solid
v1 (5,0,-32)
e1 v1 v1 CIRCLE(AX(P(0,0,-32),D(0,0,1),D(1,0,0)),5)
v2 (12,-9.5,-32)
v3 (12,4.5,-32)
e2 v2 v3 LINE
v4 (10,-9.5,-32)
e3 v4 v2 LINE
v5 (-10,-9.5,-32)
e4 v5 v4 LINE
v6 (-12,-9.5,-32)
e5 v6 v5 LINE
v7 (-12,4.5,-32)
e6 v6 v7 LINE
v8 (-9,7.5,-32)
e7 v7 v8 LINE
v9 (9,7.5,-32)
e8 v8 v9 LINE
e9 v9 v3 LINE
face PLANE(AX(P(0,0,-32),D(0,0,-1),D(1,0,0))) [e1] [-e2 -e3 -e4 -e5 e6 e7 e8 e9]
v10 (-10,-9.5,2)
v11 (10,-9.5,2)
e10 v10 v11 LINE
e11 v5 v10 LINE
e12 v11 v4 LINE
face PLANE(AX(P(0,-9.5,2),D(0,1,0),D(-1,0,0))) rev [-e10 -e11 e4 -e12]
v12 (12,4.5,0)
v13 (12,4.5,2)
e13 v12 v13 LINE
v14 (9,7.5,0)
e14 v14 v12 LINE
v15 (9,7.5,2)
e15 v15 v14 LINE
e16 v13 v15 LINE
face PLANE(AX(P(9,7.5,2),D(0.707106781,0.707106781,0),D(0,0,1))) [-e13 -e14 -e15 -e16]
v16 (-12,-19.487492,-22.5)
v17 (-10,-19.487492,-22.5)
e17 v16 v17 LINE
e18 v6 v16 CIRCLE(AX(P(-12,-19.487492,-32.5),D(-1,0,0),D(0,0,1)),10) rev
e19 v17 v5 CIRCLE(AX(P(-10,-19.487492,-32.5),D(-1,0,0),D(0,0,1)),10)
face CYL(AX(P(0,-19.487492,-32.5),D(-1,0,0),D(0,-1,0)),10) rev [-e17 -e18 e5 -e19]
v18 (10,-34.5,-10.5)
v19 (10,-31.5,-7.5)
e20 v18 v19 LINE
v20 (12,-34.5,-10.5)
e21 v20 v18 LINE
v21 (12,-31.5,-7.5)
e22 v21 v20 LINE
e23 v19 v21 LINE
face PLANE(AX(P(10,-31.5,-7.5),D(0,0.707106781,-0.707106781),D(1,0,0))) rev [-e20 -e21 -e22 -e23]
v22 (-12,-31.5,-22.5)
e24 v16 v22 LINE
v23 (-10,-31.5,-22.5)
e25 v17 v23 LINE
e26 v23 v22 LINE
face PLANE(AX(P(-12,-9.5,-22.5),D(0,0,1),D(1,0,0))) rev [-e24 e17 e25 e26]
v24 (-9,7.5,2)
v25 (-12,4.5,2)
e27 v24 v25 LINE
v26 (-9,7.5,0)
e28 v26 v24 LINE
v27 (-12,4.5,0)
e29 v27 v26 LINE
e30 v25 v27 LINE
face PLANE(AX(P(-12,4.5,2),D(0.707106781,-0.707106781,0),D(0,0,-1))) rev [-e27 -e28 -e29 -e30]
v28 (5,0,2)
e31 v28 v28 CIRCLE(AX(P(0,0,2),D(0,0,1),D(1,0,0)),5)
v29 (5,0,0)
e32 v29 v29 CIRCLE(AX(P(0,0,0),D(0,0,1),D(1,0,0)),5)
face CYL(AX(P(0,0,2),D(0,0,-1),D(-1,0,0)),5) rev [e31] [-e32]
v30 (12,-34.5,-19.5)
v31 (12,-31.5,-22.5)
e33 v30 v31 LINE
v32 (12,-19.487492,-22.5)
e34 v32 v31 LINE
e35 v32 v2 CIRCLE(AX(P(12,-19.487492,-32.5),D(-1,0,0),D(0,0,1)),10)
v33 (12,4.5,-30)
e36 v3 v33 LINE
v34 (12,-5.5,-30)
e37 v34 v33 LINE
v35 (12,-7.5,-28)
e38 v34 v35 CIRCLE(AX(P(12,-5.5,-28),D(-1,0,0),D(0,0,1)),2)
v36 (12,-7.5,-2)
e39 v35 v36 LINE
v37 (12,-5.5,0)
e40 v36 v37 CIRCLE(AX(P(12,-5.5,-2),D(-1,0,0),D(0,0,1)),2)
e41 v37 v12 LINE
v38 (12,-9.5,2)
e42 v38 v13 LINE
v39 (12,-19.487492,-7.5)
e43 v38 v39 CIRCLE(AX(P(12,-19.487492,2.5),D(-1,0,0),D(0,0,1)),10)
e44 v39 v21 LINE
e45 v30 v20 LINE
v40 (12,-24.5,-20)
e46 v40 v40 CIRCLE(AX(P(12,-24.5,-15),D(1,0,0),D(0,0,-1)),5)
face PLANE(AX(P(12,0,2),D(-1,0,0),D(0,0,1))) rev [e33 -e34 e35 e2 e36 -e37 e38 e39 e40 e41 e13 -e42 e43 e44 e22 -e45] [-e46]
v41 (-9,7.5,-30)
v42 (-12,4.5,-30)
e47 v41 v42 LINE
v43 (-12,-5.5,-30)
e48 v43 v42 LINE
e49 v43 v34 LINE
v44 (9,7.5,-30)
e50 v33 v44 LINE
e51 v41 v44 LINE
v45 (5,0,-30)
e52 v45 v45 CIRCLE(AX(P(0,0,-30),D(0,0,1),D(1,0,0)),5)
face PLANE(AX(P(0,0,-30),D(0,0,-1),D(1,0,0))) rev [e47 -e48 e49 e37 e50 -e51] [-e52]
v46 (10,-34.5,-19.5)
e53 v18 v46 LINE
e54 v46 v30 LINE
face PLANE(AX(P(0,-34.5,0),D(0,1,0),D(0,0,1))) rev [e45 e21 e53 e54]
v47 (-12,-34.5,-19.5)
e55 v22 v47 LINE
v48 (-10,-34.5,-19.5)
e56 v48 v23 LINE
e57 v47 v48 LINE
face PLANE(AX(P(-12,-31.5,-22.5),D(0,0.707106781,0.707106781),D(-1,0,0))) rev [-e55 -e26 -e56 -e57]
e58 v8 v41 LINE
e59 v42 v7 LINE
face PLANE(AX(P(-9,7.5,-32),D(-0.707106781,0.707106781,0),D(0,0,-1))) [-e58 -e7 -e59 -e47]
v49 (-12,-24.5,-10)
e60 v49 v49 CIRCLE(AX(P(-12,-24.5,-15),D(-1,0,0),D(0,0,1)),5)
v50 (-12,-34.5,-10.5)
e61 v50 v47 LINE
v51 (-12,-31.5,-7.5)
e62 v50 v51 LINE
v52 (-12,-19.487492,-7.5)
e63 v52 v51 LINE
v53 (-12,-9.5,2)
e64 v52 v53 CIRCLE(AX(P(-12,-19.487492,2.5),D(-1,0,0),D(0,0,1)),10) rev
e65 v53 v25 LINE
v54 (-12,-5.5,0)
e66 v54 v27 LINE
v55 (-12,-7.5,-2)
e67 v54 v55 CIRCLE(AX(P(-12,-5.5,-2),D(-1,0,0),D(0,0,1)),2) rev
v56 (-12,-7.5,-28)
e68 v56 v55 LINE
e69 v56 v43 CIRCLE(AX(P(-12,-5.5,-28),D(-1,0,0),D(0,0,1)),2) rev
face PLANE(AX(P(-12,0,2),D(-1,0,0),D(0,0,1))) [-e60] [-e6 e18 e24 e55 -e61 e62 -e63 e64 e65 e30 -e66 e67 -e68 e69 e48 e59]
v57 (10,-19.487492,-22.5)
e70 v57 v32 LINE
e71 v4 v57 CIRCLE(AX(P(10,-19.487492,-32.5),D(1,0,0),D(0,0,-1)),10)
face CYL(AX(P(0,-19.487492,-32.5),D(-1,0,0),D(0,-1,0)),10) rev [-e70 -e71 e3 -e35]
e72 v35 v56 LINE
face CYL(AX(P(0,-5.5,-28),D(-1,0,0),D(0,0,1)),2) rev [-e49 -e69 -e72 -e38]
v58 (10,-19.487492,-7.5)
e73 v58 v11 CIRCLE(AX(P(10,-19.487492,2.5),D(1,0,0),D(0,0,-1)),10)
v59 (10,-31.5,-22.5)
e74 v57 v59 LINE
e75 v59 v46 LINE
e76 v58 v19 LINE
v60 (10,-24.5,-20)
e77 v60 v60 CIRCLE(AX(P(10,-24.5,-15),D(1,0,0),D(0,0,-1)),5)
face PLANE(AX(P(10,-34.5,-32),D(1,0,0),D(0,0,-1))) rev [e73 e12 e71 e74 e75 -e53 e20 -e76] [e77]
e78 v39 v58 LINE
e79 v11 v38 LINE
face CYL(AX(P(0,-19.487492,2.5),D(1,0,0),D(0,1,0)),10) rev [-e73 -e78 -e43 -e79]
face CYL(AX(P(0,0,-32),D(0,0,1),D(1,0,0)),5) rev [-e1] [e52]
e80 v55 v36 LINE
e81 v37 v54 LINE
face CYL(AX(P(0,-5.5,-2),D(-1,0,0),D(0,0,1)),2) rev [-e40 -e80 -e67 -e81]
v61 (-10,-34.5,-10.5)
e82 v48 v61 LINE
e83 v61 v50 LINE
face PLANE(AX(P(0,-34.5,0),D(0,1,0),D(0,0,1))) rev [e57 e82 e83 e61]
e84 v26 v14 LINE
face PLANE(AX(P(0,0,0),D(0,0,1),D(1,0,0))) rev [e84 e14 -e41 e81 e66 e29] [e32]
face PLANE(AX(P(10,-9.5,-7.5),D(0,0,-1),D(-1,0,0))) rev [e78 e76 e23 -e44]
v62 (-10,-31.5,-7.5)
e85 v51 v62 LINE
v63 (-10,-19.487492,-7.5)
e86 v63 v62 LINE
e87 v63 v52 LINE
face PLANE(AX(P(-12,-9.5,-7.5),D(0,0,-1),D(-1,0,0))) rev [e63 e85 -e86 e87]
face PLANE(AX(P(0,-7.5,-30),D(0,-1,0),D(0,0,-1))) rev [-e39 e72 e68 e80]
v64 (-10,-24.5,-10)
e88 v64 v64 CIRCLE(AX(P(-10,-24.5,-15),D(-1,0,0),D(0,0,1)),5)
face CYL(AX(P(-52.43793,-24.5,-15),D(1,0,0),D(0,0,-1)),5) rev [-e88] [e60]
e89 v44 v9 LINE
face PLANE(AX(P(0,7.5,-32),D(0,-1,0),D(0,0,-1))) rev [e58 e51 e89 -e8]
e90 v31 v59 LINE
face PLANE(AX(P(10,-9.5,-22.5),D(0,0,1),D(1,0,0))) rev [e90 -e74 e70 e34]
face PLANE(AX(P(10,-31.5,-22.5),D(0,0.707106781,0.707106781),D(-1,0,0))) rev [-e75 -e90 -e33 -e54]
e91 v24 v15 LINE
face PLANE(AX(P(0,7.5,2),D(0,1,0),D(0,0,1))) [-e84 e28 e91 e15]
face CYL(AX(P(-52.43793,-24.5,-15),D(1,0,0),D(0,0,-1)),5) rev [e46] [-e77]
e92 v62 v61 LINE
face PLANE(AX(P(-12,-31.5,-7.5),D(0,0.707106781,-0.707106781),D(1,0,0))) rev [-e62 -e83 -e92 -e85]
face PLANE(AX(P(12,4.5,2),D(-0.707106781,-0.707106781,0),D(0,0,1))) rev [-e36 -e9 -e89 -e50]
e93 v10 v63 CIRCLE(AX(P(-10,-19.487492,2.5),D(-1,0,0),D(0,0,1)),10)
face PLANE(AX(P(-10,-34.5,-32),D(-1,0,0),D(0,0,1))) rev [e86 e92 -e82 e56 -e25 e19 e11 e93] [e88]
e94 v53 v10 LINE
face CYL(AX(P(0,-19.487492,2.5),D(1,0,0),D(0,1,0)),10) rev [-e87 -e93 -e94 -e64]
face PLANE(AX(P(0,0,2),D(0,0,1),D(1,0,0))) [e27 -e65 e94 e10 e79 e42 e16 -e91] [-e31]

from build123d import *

# Parameters (mm, degrees)
SKETCH1_W           = 24
SKETCH1_H           = 15
SKETCH1_R           = 5
SKETCH1_H_2         = 2
BOSS_EXTRUDE1_DEPTH = 2
SKETCH1_3_W         = 24
SKETCH1_3_H         = 2
BOSS_EXTRUDE2_DEPTH = 30
SKETCH3_W           = 2
SKETCH3_H           = 34
BOSS_EXTRUDE3_DEPTH = 25
SKETCH4_W           = 2
SKETCH4_H           = 9.5
CUT_EXTRUDE1_DEPTH  = 25
SKETCH5_R           = 5
CUT_EXTRUDE2_DEPTH  = 64.437930135
FILLET1_R           = 10
FILLET2_R           = 2
CHAMFER1_SIZE       = 3


with BuildPart() as part:
    # Sketch1 → Boss-Extrude1 (new body)
    # profile 1 of 2: a face of its own
    with BuildSketch(Plane.XY):
        Rectangle(SKETCH1_W, SKETCH1_H)
        Circle(SKETCH1_R, mode=Mode.SUBTRACT)
    # profile 2 of 2: a face of its own
    with BuildSketch(Plane.XY):
        with Locations((0, -8.5)):
            Rectangle(SKETCH1_W, SKETCH1_H_2)
    boss_extrude1 = extrude(amount=BOSS_EXTRUDE1_DEPTH)

    # Sketch1<3> → Boss-Extrude2 (add)
    with BuildSketch(Plane.XY):
        with Locations((0, -8.5)):
            Rectangle(SKETCH1_3_W, SKETCH1_3_H)
    extrude(amount=-BOSS_EXTRUDE2_DEPTH)

    # Mirror1: Boss-Extrude1 across plane
    add(boss_extrude1.mirror(Plane(origin=(0, 0, -15), x_dir=(1, 0, 0), z_dir=(0, 0, -1))))

    # Sketch3 → Boss-Extrude3 (add)
    with BuildSketch(Plane.XZ.offset(9.5)):
        with Locations((-11, -15)):
            Rectangle(SKETCH3_W, SKETCH3_H)
        with Locations((11, -15)):
            Rectangle(SKETCH3_W, SKETCH3_H)
    extrude(amount=BOSS_EXTRUDE3_DEPTH)

    # Sketch4 → Cut-Extrude1 (cut)
    with BuildSketch(Plane.XZ.offset(34.5)):
        with Locations((-11, -27.25)):
            Rectangle(SKETCH4_W, SKETCH4_H)
        with Locations((-11, -2.75)):
            Rectangle(SKETCH4_W, SKETCH4_H)
        with Locations((11, -2.75)):
            Rectangle(SKETCH4_W, SKETCH4_H)
        with Locations((11, -27.25)):
            Rectangle(SKETCH4_W, SKETCH4_H)
    extrude(amount=-CUT_EXTRUDE1_DEPTH, mode=Mode.SUBTRACT)

    # Sketch5 → Cut-Extrude2 (cut)
    with BuildSketch(Plane(origin=(12, 0, 0), x_dir=(0, 0, -1), z_dir=(1, 0, 0))):
        with Locations((15, -24.5)):
            Circle(SKETCH5_R)
    extrude(amount=-CUT_EXTRUDE2_DEPTH, mode=Mode.SUBTRACT)

    # Fillet1
    # the kernel refuses this fillet: 10 mm, written as the material it adds along each edge
    with BuildSketch(Plane(origin=(12, -9.5, -7.5), x_dir=(0, 0, 1), z_dir=(-1, 0, 0)), Plane(origin=(-10, -9.5, -7.5), x_dir=(0, 0, 1), z_dir=(-1, 0, 0))) as fillet1_piece_1:
        with BuildLine():
            CenterArc((10, -9.987492178), FILLET1_R, 92.865983983, 87.134016017)
            Line((0, -9.987492178), (-0.2, -9.987492178))
            Line((-0.2, -9.987492178), (-0.2, 0))
            Line((-0.2, 0), (0, 0.2))
            ThreePointArc((0, 0.2), (4.75, 0.2), (9.49, 0.199749844))
            Line((9.49, 0.199749844), (9.5, 0))
        make_face()
    extrude(amount=2)
    with BuildSketch(Plane(origin=(12, -9.5, -7.5), x_dir=(0, 0, 1), z_dir=(-1, 0, 0))) as fillet1_piece_2_section:
        with BuildLine():
            CenterArc((10, -9.987492178), FILLET1_R, 92.865983983, 87.134016017)
            Line((0, -9.987492178), (-0.2, -9.987492178))
            Line((-0.2, -9.987492178), (-0.2, 0))
            Line((-0.2, 0), (0, 0.2))
            ThreePointArc((0, 0.2), (4.75, 0.2), (9.49, 0.199749844))
            Line((9.49, 0.199749844), (9.5, 0))
        make_face()
    fillet1_piece_2 = extrude(amount=26.968730444, mode=Mode.PRIVATE)
    fillet1_piece_2 = split(fillet1_piece_2, bisect_by=Plane(origin=(-12, -11.774818107, -5.276261627), z_dir=(1, 0, 0)), keep=Keep.TOP, mode=Mode.PRIVATE)
    fillet1_piece_2 = split(fillet1_piece_2, bisect_by=Plane(origin=(-10, -11.774818107, -5.276261627), z_dir=(-1, 0, 0)), keep=Keep.TOP, mode=Mode.PRIVATE)
    add(fillet1_piece_2)
    with BuildSketch(Plane(origin=(12, -9.5, -22.5), x_dir=(0, 0, -1), z_dir=(-1, 0, 0)), Plane(origin=(-10, -9.5, -22.5), x_dir=(0, 0, -1), z_dir=(-1, 0, 0))) as fillet1_piece_3:
        with BuildLine():
            CenterArc((10, 9.987492178), FILLET1_R, 180, 87.134016017)
            Line((0, 9.987492178), (-0.2, 9.987492178))
            Line((-0.2, 9.987492178), (-0.2, 0))
            Line((-0.2, 0), (0, -0.2))
            ThreePointArc((0, -0.2), (4.75, -0.2), (9.49, -0.199749844))
            Line((9.49, -0.199749844), (9.5, 0))
        make_face()
    extrude(amount=2)
    with BuildSketch(Plane(origin=(12, -9.5, -22.5), x_dir=(0, 0, -1), z_dir=(-1, 0, 0))) as fillet1_piece_4_section:
        with BuildLine():
            CenterArc((10, 9.987492178), FILLET1_R, 180, 87.134016017)
            Line((0, 9.987492178), (-0.2, 9.987492178))
            Line((-0.2, 9.987492178), (-0.2, 0))
            Line((-0.2, 0), (0, -0.2))
            ThreePointArc((0, -0.2), (4.75, -0.2), (9.49, -0.199749844))
            Line((9.49, -0.199749844), (9.5, 0))
        make_face()
    fillet1_piece_4 = extrude(amount=26.968730444, mode=Mode.PRIVATE)
    fillet1_piece_4 = split(fillet1_piece_4, bisect_by=Plane(origin=(-12, -11.774818107, -24.723738373), z_dir=(1, 0, 0)), keep=Keep.TOP, mode=Mode.PRIVATE)
    fillet1_piece_4 = split(fillet1_piece_4, bisect_by=Plane(origin=(-10, -11.774818107, -24.723738373), z_dir=(-1, 0, 0)), keep=Keep.TOP, mode=Mode.PRIVATE)
    add(fillet1_piece_4)
    with BuildSketch(Plane(origin=(14.968730444, -9.5, -22.5), x_dir=(0, 0, -1), z_dir=(-1, 0, 0))) as fillet1_piece_5_section:
        with BuildLine():
            CenterArc((10, 9.987492178), FILLET1_R, 180, 87.134016017)
            Line((0, 9.987492178), (-0.2, 9.987492178))
            Line((-0.2, 9.987492178), (-0.2, 0))
            Line((-0.2, 0), (0, -0.2))
            ThreePointArc((0, -0.2), (4.75, -0.2), (9.49, -0.199749844))
            Line((9.49, -0.199749844), (9.5, 0))
        make_face()
    fillet1_piece_5 = extrude(amount=26.968730444, mode=Mode.PRIVATE)
    fillet1_piece_5 = split(fillet1_piece_5, bisect_by=Plane(origin=(12, -11.774818107, -24.723738373), z_dir=(-1, 0, 0)), keep=Keep.TOP, mode=Mode.PRIVATE)
    fillet1_piece_5 = split(fillet1_piece_5, bisect_by=Plane(origin=(10, -11.774818107, -24.723738373), z_dir=(1, 0, 0)), keep=Keep.TOP, mode=Mode.PRIVATE)
    add(fillet1_piece_5)
    with BuildSketch(Plane(origin=(14.968730444, -9.5, -7.5), x_dir=(0, 0, 1), z_dir=(-1, 0, 0))) as fillet1_piece_6_section:
        with BuildLine():
            CenterArc((10, -9.987492178), FILLET1_R, 92.865983983, 87.134016017)
            Line((0, -9.987492178), (-0.2, -9.987492178))
            Line((-0.2, -9.987492178), (-0.2, 0))
            Line((-0.2, 0), (0, 0.2))
            ThreePointArc((0, 0.2), (4.75, 0.2), (9.49, 0.199749844))
            Line((9.49, 0.199749844), (9.5, 0))
        make_face()
    fillet1_piece_6 = extrude(amount=26.968730444, mode=Mode.PRIVATE)
    fillet1_piece_6 = split(fillet1_piece_6, bisect_by=Plane(origin=(12, -11.774818107, -5.276261627), z_dir=(-1, 0, 0)), keep=Keep.TOP, mode=Mode.PRIVATE)
    fillet1_piece_6 = split(fillet1_piece_6, bisect_by=Plane(origin=(10, -11.774818107, -5.276261627), z_dir=(1, 0, 0)), keep=Keep.TOP, mode=Mode.PRIVATE)
    add(fillet1_piece_6)

    # Fillet2
    fillet2_edges = [part.edges().sort_by_distance(p)[0] for p in [
        (0, -7.5, 0),
        (0, -7.5, -30),
    ]]
    fillet(fillet2_edges, radius=FILLET2_R)

    # Chamfer1
    chamfer1_edges = [part.edges().sort_by_distance(p)[0] for p in [
        (-11, -34.5, -7.5),
        (-12, 7.5, 1),
        (12, 7.5, 1),
        (-11, -34.5, -22.5),
        (-12, 7.5, -31),
        (12, 7.5, -31),
        (11, -34.5, -22.5),
        (11, -34.5, -7.5),
    ]]
    chamfer(chamfer1_edges, length=CHAMFER1_SIZE)


solid = part.part
